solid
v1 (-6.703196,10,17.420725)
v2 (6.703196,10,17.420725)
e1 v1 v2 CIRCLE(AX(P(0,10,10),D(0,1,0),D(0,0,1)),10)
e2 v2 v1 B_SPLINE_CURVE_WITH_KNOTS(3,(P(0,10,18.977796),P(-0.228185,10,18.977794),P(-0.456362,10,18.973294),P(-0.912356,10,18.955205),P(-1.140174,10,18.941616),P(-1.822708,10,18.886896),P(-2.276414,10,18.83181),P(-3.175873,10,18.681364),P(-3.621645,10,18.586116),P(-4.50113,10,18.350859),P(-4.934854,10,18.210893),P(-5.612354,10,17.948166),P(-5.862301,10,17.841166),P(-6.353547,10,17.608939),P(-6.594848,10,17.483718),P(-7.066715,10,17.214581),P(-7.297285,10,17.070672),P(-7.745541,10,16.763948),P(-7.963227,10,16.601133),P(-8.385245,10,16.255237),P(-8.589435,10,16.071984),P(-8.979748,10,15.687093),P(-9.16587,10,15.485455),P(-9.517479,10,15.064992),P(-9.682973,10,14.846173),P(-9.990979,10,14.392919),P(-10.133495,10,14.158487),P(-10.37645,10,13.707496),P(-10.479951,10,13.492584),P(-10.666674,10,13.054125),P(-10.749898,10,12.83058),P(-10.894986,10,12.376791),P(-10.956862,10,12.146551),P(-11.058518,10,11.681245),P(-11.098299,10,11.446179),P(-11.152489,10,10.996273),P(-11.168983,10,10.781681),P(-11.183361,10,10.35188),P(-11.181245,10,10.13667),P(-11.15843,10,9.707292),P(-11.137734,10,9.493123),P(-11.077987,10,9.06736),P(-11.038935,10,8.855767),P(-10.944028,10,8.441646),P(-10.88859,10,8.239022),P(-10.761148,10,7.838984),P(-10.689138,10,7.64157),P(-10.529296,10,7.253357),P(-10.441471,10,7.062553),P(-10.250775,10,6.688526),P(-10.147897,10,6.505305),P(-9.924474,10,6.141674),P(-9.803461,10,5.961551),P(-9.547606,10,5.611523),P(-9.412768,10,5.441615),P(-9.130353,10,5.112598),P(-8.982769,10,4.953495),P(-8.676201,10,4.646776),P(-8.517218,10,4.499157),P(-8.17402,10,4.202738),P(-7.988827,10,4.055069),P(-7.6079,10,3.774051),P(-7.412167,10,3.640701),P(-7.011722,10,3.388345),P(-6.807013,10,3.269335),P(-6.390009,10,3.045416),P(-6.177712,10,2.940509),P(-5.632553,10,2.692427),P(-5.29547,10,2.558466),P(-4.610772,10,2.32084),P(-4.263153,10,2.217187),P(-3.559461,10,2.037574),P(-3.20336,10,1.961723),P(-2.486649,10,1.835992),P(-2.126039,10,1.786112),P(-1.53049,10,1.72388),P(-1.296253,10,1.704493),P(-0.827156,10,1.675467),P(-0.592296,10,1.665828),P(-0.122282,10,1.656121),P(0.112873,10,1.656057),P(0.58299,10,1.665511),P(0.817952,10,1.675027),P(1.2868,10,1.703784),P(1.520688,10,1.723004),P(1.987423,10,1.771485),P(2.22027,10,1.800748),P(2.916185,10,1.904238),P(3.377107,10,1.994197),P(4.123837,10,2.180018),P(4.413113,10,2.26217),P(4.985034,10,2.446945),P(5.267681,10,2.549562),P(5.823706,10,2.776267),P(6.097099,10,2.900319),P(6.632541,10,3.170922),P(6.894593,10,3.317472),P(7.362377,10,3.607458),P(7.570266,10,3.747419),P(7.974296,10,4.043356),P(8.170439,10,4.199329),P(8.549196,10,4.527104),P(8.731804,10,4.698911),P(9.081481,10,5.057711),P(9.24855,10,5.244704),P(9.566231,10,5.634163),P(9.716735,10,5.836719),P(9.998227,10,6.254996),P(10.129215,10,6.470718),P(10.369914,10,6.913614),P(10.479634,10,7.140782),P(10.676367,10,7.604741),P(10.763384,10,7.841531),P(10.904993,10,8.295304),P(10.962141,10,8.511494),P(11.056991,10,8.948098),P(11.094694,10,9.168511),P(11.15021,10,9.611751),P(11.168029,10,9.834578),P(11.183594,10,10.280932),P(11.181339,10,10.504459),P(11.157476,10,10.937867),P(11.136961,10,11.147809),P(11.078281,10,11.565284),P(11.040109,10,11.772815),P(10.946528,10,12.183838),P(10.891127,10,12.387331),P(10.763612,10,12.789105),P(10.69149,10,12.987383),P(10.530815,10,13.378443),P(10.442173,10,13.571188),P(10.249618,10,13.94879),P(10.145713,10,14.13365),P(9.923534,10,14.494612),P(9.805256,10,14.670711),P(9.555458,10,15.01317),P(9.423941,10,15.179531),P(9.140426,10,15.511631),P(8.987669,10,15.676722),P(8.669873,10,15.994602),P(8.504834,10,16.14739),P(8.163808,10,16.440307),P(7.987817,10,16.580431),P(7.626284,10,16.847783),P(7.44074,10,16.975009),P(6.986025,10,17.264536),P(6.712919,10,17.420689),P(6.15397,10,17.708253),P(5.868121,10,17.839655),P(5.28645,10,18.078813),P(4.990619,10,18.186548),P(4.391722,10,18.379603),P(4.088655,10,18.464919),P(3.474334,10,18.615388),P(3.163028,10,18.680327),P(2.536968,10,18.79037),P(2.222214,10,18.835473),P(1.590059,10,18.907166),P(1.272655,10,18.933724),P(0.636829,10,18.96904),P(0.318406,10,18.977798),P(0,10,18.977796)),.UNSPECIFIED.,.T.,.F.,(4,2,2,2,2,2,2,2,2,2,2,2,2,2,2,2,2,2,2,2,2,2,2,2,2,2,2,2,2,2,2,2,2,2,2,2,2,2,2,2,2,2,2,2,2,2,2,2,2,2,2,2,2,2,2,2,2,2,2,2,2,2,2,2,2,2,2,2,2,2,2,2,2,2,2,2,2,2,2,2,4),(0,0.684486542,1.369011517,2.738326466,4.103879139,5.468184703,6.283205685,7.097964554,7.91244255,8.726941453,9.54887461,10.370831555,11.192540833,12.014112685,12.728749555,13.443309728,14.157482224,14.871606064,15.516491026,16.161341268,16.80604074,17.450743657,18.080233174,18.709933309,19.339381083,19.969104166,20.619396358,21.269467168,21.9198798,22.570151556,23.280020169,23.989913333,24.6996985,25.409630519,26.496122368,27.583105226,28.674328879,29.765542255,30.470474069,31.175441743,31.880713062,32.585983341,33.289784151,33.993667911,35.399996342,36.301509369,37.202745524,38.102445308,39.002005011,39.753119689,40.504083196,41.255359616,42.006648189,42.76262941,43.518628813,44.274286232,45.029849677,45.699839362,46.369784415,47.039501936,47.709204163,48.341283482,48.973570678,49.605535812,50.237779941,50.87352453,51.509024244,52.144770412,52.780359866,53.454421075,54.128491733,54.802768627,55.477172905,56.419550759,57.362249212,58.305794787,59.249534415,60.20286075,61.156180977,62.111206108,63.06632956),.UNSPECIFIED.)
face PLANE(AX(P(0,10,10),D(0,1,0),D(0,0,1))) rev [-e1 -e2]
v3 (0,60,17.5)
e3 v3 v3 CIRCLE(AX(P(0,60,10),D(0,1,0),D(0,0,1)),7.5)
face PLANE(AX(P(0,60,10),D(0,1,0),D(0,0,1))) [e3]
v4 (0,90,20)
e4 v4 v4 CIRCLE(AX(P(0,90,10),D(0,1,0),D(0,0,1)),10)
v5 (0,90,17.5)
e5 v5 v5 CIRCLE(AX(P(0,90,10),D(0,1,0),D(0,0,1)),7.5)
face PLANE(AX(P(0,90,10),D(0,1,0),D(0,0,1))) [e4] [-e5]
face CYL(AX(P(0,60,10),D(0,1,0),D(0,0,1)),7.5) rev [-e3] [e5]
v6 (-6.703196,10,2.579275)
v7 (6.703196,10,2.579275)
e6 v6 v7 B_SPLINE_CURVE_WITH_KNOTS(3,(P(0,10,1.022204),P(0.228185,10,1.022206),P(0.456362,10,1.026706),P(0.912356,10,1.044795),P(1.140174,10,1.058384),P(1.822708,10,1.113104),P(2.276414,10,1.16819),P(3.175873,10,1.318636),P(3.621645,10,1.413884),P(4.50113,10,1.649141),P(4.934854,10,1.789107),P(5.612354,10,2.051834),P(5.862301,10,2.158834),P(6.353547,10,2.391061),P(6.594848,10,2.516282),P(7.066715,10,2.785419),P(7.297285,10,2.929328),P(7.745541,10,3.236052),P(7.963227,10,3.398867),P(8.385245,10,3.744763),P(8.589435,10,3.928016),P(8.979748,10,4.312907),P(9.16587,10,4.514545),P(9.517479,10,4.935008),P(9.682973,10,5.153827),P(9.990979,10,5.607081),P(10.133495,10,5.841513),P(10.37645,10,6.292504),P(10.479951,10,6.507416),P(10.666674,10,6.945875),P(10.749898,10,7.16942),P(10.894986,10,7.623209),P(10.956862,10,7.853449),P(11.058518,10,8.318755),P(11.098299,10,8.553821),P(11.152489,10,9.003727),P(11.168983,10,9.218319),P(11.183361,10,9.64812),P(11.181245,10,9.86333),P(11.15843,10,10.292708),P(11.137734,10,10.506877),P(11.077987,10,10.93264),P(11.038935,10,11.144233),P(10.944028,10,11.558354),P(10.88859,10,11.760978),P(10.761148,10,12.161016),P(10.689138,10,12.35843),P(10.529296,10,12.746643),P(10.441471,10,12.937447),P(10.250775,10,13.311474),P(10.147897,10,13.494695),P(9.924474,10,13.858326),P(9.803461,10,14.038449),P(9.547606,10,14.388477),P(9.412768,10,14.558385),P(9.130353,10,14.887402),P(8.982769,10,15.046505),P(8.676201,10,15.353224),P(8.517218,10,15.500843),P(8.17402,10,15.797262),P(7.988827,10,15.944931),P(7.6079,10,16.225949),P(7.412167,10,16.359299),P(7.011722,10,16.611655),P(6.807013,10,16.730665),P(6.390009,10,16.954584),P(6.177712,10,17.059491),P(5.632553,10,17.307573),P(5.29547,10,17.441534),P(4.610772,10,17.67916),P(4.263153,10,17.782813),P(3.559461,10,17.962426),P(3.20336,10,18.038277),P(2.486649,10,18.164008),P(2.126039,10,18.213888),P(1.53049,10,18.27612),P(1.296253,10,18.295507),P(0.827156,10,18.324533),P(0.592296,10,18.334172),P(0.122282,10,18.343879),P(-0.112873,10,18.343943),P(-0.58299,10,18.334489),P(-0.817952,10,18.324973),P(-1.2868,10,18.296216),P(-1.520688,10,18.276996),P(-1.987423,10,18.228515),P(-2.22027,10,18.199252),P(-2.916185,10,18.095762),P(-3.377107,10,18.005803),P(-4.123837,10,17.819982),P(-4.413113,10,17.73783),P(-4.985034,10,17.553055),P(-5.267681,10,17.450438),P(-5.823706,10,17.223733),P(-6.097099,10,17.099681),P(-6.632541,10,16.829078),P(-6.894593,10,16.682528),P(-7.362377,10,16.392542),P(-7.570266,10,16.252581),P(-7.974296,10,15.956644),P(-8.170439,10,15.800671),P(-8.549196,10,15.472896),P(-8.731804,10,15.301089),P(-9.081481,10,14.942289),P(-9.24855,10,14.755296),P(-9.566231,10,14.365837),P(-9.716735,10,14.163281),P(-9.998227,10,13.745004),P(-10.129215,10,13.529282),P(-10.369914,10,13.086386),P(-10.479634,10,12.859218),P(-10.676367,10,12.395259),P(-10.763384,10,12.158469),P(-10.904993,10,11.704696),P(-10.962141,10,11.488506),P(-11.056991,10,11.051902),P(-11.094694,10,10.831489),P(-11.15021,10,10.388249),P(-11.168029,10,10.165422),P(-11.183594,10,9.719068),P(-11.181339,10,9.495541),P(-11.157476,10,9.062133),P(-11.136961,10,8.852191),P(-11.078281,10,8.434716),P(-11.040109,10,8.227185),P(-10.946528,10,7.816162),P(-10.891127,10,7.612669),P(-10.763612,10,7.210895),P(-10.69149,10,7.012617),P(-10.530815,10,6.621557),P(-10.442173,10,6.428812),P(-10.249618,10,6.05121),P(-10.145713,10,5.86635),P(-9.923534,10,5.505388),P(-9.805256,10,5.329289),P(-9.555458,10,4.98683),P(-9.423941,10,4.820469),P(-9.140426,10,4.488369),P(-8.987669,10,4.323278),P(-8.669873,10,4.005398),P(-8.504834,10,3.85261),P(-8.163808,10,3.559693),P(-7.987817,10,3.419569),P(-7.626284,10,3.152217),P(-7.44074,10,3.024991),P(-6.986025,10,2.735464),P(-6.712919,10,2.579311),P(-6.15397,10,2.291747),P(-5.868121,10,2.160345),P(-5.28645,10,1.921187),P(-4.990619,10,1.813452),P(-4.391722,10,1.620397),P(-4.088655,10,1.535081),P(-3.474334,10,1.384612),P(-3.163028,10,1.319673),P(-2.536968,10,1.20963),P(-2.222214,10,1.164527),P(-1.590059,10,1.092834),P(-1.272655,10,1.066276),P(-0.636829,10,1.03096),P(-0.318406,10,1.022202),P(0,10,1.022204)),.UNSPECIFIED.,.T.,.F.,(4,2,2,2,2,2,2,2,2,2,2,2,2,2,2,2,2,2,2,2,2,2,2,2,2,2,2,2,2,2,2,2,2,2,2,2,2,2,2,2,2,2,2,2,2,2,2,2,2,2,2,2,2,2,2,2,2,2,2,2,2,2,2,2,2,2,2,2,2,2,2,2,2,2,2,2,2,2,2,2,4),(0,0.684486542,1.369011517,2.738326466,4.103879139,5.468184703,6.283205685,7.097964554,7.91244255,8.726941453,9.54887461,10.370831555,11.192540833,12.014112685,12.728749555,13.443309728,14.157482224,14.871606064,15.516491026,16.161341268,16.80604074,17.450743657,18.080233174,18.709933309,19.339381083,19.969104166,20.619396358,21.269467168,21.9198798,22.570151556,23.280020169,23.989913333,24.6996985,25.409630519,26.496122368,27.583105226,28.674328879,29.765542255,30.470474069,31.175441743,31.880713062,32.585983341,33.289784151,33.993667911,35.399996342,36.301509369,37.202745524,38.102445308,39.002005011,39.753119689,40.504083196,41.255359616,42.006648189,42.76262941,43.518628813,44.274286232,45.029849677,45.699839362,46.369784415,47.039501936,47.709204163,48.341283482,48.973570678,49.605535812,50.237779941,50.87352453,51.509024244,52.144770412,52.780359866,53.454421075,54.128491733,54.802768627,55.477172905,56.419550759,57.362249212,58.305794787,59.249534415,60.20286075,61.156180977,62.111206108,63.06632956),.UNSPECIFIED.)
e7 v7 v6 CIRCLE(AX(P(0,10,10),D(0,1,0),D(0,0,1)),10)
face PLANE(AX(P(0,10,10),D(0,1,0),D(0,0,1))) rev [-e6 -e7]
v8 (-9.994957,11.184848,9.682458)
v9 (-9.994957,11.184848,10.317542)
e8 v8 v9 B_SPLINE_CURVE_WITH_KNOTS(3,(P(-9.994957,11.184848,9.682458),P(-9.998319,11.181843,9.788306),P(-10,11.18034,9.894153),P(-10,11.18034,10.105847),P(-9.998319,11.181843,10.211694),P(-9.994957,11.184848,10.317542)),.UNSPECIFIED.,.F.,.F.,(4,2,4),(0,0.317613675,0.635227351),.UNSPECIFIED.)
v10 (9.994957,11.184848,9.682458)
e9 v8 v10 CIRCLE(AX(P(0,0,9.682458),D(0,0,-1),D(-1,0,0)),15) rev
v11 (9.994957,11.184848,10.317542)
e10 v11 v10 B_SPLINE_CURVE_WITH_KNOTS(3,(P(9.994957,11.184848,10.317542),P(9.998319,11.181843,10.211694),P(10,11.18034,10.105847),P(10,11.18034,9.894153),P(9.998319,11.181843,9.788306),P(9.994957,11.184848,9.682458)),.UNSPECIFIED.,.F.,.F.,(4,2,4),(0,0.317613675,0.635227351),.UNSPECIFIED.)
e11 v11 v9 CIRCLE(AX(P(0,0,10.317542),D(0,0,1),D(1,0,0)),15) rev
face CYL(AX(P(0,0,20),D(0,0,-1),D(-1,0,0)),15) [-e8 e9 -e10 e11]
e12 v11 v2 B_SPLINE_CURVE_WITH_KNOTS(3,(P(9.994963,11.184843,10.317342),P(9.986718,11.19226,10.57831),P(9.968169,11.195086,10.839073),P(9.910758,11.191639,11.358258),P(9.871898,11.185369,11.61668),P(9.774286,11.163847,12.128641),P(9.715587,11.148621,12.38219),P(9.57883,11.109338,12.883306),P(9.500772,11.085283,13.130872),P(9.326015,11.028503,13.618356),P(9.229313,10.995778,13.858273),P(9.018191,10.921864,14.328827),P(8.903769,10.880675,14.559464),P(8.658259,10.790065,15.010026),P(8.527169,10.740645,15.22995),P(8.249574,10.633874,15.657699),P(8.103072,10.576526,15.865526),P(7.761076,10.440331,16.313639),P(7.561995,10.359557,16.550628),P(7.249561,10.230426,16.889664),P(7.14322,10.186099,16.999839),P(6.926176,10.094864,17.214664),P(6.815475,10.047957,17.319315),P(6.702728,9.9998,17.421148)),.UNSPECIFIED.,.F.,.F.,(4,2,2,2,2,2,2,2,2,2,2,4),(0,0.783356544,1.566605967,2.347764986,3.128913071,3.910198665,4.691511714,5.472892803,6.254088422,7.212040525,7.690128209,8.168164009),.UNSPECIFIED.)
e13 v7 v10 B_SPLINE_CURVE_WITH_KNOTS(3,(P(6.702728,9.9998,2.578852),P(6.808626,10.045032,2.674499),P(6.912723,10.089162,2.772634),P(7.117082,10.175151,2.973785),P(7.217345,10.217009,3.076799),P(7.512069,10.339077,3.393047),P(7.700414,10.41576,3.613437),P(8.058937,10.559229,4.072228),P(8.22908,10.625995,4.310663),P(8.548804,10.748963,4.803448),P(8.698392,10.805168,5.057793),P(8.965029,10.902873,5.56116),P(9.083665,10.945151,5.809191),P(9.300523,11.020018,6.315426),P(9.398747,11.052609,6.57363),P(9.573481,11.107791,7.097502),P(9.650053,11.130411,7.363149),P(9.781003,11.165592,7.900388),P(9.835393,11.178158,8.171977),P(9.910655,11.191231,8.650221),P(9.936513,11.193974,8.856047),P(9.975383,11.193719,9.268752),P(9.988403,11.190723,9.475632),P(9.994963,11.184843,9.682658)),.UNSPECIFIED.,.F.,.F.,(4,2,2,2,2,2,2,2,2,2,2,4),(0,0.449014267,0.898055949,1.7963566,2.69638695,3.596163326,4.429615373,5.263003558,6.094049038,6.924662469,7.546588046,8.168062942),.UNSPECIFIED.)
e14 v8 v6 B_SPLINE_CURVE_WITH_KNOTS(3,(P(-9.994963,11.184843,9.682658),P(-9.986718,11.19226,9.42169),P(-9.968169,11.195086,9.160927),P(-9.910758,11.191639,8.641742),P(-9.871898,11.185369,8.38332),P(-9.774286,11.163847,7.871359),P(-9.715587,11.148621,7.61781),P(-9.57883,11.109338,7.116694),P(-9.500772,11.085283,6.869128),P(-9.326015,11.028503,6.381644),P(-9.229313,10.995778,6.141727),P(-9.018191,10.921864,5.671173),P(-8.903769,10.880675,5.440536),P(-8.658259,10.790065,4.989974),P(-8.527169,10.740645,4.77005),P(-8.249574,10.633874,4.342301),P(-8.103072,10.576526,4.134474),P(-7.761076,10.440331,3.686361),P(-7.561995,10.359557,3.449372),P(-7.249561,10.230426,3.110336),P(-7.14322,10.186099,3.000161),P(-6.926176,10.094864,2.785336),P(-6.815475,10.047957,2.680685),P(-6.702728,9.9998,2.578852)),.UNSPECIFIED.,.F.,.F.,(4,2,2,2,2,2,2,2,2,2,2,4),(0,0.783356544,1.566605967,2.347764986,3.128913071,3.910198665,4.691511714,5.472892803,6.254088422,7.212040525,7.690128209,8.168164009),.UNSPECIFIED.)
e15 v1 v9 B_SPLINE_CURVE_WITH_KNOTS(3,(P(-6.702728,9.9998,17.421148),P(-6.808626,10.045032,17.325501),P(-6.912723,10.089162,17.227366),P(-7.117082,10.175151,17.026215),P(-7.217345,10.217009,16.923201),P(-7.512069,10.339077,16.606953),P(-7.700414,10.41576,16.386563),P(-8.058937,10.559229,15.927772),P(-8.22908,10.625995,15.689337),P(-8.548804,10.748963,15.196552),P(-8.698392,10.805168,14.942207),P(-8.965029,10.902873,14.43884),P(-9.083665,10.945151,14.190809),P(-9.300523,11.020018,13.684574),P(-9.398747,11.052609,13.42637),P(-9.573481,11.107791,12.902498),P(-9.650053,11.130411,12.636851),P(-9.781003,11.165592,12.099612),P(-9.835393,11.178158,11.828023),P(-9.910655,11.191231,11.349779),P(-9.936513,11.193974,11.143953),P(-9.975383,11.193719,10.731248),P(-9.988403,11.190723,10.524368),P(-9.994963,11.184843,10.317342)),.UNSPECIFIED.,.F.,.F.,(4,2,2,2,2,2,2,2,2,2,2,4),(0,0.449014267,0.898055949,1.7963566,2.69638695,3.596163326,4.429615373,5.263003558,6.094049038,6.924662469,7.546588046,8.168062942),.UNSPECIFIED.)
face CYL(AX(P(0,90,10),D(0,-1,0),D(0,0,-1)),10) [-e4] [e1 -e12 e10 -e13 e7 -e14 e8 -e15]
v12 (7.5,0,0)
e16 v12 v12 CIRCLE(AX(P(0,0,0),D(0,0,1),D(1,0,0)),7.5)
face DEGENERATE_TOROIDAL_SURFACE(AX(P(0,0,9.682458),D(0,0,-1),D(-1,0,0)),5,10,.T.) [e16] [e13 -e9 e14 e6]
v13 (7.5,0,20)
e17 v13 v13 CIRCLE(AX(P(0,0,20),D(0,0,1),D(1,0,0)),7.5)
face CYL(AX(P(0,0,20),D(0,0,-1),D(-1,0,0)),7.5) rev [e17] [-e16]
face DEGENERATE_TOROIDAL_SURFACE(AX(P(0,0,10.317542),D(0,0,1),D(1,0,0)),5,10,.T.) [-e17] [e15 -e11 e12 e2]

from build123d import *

# Parameters (mm, degrees)
SKETCH1_R           = 15
SKETCH1_R_2         = 7.5
BOSS_EXTRUDE1_DEPTH = 20
FILLET1_R           = 10
BOSS_EXTRUDE3_START = 10
SKETCH2_R           = 10
BOSS_EXTRUDE3_DEPTH = 80
SKETCH5_R           = 7.5
CUT_EXTRUDE3_DEPTH  = 30


with BuildPart() as part:
    # Sketch1 → Boss-Extrude1 (new body)
    with BuildSketch(Plane.XY):
        Circle(SKETCH1_R)
        Circle(SKETCH1_R_2, mode=Mode.SUBTRACT)
    extrude(amount=BOSS_EXTRUDE1_DEPTH)

    # Fillet1
    # the kernel refuses this fillet: 10 mm, written as the material it takes off along each edge
    with BuildSketch(Plane(origin=(0, 0, 0), x_dir=(1, 0, 0), z_dir=(0, -1, 0))) as fillet1_piece_1:
        with BuildLine():
            CenterArc((5, 9.682458366), FILLET1_R, 284.477512186, 75.522487814)
            Line((7.5, 0), (7.55, -0.193649167))
            ThreePointArc((7.55, -0.193649167), (11.25, -0.2), (15, -0.2))
            Line((15, -0.2), (15.2, 0))
            Line((15.2, 0), (15.2, 9.682458366))
            Line((15.2, 9.682458366), (15, 9.682458366))
        make_face()
    revolve(axis=Axis((0, 0, 0), (0, 0, 1)), mode=Mode.SUBTRACT)
    with BuildSketch(Plane(origin=(0, 0, 20), x_dir=(1, 0, 0), z_dir=(0, -1, 0))) as fillet1_piece_2:
        with BuildLine():
            CenterArc((5, -9.682458366), FILLET1_R, 0, 75.522487814)
            Line((7.5, 0), (7.55, 0.193649167))
            ThreePointArc((7.55, 0.193649167), (11.25, 0.2), (15, 0.2))
            Line((15, 0.2), (15.2, 0))
            Line((15.2, 0), (15.2, -9.682458366))
            Line((15.2, -9.682458366), (15, -9.682458366))
        make_face()
    revolve(axis=Axis((0, 0, 20), (0, 0, 1)), mode=Mode.SUBTRACT)

    # Sketch2 → Boss-Extrude3 (add)
    with BuildSketch(Plane(origin=(0, 0, 0), x_dir=(1, 0, 0), z_dir=(0, 1, 0)).offset(BOSS_EXTRUDE3_START)):
        with Locations(Location((0, -10, 0), (0, 0, 47.908263914))):
            Circle(SKETCH2_R)
    extrude(amount=BOSS_EXTRUDE3_DEPTH)

    # Sketch5 → Cut-Extrude3 (cut)
    with BuildSketch(Plane(origin=(0, 90, 0), x_dir=(1, 0, 0), z_dir=(0, 1, 0))):
        with Locations(Location((0, -10, 0), (0, 0, 270))):
            Circle(SKETCH5_R)
    extrude(amount=-CUT_EXTRUDE3_DEPTH, mode=Mode.SUBTRACT)


solid = part.part
